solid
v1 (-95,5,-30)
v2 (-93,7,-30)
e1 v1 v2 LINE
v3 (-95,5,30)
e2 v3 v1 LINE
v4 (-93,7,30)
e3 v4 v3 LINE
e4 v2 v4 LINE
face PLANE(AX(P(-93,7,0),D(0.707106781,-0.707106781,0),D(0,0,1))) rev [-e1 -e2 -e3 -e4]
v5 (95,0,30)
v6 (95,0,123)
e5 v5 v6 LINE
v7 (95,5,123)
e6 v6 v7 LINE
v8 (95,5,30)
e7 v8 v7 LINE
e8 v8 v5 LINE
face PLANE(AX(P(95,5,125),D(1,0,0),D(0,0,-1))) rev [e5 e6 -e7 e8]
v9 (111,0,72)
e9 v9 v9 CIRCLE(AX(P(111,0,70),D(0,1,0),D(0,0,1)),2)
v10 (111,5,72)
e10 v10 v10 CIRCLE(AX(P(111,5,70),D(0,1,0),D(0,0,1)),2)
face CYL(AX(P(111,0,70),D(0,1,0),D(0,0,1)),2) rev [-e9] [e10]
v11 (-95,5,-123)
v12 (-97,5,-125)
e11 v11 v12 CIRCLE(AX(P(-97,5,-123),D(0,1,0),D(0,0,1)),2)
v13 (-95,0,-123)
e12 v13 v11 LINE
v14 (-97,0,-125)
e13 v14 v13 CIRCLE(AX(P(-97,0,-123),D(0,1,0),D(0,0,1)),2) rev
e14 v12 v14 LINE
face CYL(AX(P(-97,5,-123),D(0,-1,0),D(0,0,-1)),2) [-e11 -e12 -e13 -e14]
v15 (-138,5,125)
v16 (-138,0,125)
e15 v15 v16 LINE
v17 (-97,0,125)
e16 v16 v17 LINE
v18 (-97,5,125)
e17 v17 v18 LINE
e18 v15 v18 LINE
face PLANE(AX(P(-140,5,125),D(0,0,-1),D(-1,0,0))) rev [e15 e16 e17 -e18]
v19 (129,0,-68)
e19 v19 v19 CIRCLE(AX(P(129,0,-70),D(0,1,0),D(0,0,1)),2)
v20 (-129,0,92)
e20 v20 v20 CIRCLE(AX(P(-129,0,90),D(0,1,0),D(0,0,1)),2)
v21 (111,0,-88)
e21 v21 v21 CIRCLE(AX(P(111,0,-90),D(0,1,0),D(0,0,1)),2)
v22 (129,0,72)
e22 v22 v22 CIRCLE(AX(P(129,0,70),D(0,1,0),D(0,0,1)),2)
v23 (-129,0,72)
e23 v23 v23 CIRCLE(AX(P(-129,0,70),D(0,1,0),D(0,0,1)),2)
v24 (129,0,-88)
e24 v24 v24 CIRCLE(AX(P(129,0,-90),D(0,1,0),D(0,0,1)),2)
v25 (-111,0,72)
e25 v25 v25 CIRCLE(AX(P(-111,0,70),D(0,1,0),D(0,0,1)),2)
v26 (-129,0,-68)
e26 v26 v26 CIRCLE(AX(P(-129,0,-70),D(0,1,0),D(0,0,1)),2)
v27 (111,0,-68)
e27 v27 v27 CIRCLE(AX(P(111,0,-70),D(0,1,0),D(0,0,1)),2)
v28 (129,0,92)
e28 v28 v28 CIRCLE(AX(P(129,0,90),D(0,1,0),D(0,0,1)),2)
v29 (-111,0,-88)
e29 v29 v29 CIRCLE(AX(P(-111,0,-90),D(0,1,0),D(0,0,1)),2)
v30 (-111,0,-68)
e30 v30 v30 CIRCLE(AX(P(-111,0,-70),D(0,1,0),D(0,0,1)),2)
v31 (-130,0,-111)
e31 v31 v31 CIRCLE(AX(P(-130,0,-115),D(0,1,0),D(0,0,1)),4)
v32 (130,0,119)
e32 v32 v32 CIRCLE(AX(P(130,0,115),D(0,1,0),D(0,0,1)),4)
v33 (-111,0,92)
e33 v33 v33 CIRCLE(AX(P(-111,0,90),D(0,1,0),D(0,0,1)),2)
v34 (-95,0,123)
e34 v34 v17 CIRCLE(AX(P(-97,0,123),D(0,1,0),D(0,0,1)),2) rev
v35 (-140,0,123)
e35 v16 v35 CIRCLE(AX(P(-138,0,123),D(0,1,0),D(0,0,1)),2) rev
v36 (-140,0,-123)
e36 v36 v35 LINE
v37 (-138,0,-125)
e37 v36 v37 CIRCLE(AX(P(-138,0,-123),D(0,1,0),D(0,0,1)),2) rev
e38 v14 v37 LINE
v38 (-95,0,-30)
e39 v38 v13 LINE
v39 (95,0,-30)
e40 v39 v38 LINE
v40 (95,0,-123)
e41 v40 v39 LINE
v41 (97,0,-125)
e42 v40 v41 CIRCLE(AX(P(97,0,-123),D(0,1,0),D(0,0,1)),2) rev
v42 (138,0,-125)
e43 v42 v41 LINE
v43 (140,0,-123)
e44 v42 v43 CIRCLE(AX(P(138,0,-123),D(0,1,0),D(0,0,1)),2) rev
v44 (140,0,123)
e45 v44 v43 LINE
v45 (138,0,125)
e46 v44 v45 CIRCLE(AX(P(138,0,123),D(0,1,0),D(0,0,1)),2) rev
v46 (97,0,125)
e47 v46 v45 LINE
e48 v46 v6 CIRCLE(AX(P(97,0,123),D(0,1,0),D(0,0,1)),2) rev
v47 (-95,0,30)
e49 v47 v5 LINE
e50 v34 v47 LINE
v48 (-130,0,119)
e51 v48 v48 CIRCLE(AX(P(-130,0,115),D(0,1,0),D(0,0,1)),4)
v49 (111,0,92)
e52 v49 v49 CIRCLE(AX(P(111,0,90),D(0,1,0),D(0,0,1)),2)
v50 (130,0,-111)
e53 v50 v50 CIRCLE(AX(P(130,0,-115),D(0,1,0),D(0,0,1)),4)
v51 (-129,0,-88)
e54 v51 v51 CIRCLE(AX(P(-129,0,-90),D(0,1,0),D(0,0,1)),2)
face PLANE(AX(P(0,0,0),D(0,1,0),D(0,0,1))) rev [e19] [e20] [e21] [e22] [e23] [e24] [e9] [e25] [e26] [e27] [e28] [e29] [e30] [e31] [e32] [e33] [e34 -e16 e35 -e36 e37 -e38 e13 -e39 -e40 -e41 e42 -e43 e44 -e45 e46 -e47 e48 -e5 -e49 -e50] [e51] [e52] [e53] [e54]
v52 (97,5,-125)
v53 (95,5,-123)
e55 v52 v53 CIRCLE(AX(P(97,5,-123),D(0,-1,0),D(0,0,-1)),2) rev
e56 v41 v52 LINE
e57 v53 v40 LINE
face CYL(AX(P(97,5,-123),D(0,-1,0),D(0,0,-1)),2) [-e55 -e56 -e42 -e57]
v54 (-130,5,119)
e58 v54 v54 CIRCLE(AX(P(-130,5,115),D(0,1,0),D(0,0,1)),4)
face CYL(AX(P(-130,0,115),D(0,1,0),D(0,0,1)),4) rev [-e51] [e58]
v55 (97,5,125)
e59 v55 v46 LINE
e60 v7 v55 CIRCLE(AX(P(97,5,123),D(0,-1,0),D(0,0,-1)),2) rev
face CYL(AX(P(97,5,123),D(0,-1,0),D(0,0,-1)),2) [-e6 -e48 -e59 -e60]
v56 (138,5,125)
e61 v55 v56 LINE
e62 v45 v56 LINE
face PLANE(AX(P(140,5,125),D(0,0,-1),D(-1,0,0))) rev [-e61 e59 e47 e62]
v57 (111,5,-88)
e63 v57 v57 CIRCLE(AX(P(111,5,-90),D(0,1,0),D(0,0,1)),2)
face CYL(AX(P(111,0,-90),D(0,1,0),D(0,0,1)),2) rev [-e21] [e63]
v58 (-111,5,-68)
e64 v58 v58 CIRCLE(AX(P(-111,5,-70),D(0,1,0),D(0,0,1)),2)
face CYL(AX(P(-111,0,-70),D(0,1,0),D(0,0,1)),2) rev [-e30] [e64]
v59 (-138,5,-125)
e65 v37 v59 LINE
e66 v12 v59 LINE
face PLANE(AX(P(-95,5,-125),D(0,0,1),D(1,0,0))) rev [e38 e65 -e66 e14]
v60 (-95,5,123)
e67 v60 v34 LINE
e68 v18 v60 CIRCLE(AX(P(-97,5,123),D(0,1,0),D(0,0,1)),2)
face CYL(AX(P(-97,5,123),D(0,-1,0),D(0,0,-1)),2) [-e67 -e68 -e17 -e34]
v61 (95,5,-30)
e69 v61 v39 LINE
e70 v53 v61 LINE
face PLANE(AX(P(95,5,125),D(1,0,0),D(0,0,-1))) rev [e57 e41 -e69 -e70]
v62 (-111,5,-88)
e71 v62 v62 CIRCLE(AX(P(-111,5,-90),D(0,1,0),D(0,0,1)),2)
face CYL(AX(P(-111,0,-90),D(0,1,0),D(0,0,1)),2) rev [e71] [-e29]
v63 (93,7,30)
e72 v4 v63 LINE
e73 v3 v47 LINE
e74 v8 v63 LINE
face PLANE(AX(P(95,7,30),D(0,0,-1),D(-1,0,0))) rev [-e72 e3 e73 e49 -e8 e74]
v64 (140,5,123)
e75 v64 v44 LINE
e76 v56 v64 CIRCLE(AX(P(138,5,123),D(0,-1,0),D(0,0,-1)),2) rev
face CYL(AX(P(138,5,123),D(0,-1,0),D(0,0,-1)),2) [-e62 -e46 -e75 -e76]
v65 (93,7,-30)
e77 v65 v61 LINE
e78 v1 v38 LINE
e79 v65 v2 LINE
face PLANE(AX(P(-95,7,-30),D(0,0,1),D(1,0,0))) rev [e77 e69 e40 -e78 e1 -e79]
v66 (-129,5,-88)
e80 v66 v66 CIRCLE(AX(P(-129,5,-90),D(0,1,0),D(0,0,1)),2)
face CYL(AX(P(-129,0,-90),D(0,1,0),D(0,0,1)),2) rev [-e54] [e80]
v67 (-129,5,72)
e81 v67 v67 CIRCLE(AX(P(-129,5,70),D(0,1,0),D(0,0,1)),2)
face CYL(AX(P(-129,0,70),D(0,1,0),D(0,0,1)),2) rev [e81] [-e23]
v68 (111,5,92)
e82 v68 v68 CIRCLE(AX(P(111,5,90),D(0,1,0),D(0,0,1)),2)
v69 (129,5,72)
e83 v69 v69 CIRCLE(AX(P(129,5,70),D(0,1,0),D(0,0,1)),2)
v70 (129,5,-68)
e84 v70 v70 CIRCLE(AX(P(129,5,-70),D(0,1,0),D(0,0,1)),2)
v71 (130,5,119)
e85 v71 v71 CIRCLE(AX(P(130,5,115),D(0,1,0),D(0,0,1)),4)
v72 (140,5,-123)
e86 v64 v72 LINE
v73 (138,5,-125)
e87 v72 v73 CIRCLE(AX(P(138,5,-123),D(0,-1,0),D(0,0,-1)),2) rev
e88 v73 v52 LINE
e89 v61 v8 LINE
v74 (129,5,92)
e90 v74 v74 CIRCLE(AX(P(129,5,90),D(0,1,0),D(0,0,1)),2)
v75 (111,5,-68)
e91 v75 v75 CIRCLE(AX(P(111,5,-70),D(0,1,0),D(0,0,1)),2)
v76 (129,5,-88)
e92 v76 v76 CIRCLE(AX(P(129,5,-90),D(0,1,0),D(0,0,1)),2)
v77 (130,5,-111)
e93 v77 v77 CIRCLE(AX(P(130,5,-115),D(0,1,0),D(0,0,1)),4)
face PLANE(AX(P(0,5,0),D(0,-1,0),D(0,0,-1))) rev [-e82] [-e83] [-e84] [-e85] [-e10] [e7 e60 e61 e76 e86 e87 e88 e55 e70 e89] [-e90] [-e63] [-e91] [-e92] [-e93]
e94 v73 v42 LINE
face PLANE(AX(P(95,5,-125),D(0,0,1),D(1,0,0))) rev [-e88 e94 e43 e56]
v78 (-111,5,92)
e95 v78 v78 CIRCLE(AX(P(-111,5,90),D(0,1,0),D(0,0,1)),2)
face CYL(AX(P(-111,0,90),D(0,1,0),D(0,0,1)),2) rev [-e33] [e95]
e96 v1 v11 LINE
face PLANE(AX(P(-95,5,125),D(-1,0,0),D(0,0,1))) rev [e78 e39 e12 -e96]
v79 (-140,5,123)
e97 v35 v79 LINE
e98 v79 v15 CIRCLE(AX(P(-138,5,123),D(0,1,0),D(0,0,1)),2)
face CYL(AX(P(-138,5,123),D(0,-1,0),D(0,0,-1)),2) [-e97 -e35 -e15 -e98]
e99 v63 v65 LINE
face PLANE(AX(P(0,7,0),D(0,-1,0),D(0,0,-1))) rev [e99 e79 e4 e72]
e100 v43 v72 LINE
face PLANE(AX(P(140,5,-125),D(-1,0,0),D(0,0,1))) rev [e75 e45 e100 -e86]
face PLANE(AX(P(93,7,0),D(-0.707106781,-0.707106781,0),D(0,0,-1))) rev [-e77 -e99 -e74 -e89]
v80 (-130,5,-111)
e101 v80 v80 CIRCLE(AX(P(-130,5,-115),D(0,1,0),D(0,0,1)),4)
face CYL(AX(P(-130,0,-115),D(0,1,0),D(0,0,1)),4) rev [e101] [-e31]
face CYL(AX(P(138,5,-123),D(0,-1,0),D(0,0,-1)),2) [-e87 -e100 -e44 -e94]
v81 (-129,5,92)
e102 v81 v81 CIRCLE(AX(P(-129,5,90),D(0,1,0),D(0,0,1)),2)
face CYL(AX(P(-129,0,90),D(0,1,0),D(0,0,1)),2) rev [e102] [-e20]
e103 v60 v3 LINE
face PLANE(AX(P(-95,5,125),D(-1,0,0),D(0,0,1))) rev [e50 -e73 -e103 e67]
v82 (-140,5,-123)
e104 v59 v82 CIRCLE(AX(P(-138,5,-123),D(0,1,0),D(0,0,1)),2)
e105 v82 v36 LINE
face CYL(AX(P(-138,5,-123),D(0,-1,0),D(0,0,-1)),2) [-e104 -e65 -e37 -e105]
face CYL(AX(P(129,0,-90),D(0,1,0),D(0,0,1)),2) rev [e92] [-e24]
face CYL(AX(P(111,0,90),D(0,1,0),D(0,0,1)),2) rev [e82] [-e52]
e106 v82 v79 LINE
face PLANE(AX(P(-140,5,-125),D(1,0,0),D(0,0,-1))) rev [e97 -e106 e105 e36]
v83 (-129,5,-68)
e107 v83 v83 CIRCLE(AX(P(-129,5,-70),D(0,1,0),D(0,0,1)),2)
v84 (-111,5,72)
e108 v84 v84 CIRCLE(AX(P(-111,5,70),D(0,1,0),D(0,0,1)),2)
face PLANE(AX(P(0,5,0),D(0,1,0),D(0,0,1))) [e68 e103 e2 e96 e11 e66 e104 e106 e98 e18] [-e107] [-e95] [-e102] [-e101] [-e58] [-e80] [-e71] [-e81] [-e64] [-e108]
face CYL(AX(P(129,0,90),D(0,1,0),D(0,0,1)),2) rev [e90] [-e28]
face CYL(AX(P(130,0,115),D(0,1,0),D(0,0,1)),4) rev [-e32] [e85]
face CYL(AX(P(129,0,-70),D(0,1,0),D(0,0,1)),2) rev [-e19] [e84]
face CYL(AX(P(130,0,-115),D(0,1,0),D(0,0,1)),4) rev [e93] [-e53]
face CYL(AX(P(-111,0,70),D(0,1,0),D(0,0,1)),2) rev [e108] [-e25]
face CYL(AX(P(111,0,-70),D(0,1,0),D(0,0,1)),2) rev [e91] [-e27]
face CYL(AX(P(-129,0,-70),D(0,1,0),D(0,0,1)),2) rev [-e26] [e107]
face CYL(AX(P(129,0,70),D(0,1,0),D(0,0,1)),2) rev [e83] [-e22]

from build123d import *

# Parameters (mm, degrees)
SKETCH1_W             = 45
SKETCH1_H             = 250
BOSS_EXTRUDE1_DEPTH   = 5
BOSS_EXTRUDE1_2_DEPTH = 5
SKETCH2_W             = 190
SKETCH2_H             = 60
BOSS_EXTRUDE2_DEPTH   = 7
CHAMFER1_SIZE         = 2
FILLET1_R             = 2
SKETCH3_R             = 2
CUT_EXTRUDE1_DEPTH    = 188.749833555
LPATTERN1_COUNT       = 2
LPATTERN1_PITCH       = 240
LPATTERN1_COUNT_DIR2  = 2
LPATTERN1_PITCH_DIR2  = 160
SKETCH4_R             = 4
CUT_EXTRUDE2_DEPTH    = 188.749833555
LPATTERN2_COUNT       = 2
LPATTERN2_PITCH       = 260
LPATTERN2_COUNT_DIR2  = 2
LPATTERN2_PITCH_DIR2  = 230


with BuildPart() as part:
    # Sketch1 → Boss-Extrude1 (new body)
    with BuildSketch(Plane(origin=(0, 0, 0), x_dir=(1, 0, 0), z_dir=(0, 1, 0))):
        with Locations((-117.5, 0)):
            Rectangle(SKETCH1_W, SKETCH1_H)
    extrude(amount=BOSS_EXTRUDE1_DEPTH)



with BuildPart() as body_2:
    # Sketch1 → Boss-Extrude1 2 (new body)
    with BuildSketch(Plane(origin=(0, 0, 0), x_dir=(1, 0, 0), z_dir=(0, 1, 0))):
        with Locations((117.5, 0)):
            Rectangle(SKETCH1_W, SKETCH1_H)
    extrude(amount=BOSS_EXTRUDE1_2_DEPTH)


with BuildPart() as part_1:
    add(part.part)

    add(body_2.part)  # Boss-Extrude2 merges body 2
    # Sketch2 → Boss-Extrude2 (add)
    with BuildSketch(Plane(origin=(0, 0, 0), x_dir=(1, 0, 0), z_dir=(0, 1, 0))):
        Rectangle(SKETCH2_W, SKETCH2_H)
    extrude(amount=BOSS_EXTRUDE2_DEPTH)

    # Chamfer1
    chamfer1_edges = [part_1.edges().sort_by_distance(p)[0] for p in [
        (95, 7, 0),
        (-95, 7, 0),
    ]]
    chamfer(chamfer1_edges, length=CHAMFER1_SIZE - 0.0001)  # a hair under: the kernel refuses the full size

    # Fillet1
    fillet1_edges = [part_1.edges().sort_by_distance(p)[0] for p in [
        (95, 2.5, -125),
        (95, 2.5, 125),
        (140, 2.5, 125),
        (140, 2.5, -125),
        (-95, 2.5, -125),
        (-95, 2.5, 125),
        (-140, 2.5, 125),
        (-140, 2.5, -125),
    ]]
    fillet(fillet1_edges, radius=FILLET1_R)

    # Sketch3 → Cut-Extrude1 (cut, through all)
    with BuildSketch(Plane(origin=(0, 5, 0), x_dir=(1, 0, 0), z_dir=(0, 1, 0))):
        with Locations(Location((-129, 90, 0), (0, 0, 270))):
            Circle(SKETCH3_R)
        with Locations(Location((-111, 90, 0), (0, 0, 270))):
            Circle(SKETCH3_R)
        with Locations(Location((-129, 70, 0), (0, 0, 270))):
            Circle(SKETCH3_R)
        with Locations(Location((-111, 70, 0), (0, 0, 270))):
            Circle(SKETCH3_R)
    cut_extrude1 = extrude(amount=-CUT_EXTRUDE1_DEPTH, mode=Mode.SUBTRACT)

    # LPattern1: Cut-Extrude1 2 × 2
    with Locations(*[(i * LPATTERN1_PITCH, 0, j * LPATTERN1_PITCH_DIR2) for i in range(LPATTERN1_COUNT) for j in range(LPATTERN1_COUNT_DIR2) if (i, j) != (0, 0)]):
        add(cut_extrude1, mode=Mode.SUBTRACT)

    # Sketch4 → Cut-Extrude2 (cut, through all)
    with BuildSketch(Plane(origin=(0, 5, 0), x_dir=(1, 0, 0), z_dir=(0, 1, 0))):
        with Locations(Location((-130, 115, 0), (0, 0, 270))):
            Circle(SKETCH4_R)
    cut_extrude2 = extrude(amount=-CUT_EXTRUDE2_DEPTH, mode=Mode.SUBTRACT)

    # LPattern2: Cut-Extrude2 2 × 2
    with Locations(*[(i * LPATTERN2_PITCH, 0, j * LPATTERN2_PITCH_DIR2) for i in range(LPATTERN2_COUNT) for j in range(LPATTERN2_COUNT_DIR2) if (i, j) != (0, 0)]):
        add(cut_extrude2, mode=Mode.SUBTRACT)


solid = part_1.part
